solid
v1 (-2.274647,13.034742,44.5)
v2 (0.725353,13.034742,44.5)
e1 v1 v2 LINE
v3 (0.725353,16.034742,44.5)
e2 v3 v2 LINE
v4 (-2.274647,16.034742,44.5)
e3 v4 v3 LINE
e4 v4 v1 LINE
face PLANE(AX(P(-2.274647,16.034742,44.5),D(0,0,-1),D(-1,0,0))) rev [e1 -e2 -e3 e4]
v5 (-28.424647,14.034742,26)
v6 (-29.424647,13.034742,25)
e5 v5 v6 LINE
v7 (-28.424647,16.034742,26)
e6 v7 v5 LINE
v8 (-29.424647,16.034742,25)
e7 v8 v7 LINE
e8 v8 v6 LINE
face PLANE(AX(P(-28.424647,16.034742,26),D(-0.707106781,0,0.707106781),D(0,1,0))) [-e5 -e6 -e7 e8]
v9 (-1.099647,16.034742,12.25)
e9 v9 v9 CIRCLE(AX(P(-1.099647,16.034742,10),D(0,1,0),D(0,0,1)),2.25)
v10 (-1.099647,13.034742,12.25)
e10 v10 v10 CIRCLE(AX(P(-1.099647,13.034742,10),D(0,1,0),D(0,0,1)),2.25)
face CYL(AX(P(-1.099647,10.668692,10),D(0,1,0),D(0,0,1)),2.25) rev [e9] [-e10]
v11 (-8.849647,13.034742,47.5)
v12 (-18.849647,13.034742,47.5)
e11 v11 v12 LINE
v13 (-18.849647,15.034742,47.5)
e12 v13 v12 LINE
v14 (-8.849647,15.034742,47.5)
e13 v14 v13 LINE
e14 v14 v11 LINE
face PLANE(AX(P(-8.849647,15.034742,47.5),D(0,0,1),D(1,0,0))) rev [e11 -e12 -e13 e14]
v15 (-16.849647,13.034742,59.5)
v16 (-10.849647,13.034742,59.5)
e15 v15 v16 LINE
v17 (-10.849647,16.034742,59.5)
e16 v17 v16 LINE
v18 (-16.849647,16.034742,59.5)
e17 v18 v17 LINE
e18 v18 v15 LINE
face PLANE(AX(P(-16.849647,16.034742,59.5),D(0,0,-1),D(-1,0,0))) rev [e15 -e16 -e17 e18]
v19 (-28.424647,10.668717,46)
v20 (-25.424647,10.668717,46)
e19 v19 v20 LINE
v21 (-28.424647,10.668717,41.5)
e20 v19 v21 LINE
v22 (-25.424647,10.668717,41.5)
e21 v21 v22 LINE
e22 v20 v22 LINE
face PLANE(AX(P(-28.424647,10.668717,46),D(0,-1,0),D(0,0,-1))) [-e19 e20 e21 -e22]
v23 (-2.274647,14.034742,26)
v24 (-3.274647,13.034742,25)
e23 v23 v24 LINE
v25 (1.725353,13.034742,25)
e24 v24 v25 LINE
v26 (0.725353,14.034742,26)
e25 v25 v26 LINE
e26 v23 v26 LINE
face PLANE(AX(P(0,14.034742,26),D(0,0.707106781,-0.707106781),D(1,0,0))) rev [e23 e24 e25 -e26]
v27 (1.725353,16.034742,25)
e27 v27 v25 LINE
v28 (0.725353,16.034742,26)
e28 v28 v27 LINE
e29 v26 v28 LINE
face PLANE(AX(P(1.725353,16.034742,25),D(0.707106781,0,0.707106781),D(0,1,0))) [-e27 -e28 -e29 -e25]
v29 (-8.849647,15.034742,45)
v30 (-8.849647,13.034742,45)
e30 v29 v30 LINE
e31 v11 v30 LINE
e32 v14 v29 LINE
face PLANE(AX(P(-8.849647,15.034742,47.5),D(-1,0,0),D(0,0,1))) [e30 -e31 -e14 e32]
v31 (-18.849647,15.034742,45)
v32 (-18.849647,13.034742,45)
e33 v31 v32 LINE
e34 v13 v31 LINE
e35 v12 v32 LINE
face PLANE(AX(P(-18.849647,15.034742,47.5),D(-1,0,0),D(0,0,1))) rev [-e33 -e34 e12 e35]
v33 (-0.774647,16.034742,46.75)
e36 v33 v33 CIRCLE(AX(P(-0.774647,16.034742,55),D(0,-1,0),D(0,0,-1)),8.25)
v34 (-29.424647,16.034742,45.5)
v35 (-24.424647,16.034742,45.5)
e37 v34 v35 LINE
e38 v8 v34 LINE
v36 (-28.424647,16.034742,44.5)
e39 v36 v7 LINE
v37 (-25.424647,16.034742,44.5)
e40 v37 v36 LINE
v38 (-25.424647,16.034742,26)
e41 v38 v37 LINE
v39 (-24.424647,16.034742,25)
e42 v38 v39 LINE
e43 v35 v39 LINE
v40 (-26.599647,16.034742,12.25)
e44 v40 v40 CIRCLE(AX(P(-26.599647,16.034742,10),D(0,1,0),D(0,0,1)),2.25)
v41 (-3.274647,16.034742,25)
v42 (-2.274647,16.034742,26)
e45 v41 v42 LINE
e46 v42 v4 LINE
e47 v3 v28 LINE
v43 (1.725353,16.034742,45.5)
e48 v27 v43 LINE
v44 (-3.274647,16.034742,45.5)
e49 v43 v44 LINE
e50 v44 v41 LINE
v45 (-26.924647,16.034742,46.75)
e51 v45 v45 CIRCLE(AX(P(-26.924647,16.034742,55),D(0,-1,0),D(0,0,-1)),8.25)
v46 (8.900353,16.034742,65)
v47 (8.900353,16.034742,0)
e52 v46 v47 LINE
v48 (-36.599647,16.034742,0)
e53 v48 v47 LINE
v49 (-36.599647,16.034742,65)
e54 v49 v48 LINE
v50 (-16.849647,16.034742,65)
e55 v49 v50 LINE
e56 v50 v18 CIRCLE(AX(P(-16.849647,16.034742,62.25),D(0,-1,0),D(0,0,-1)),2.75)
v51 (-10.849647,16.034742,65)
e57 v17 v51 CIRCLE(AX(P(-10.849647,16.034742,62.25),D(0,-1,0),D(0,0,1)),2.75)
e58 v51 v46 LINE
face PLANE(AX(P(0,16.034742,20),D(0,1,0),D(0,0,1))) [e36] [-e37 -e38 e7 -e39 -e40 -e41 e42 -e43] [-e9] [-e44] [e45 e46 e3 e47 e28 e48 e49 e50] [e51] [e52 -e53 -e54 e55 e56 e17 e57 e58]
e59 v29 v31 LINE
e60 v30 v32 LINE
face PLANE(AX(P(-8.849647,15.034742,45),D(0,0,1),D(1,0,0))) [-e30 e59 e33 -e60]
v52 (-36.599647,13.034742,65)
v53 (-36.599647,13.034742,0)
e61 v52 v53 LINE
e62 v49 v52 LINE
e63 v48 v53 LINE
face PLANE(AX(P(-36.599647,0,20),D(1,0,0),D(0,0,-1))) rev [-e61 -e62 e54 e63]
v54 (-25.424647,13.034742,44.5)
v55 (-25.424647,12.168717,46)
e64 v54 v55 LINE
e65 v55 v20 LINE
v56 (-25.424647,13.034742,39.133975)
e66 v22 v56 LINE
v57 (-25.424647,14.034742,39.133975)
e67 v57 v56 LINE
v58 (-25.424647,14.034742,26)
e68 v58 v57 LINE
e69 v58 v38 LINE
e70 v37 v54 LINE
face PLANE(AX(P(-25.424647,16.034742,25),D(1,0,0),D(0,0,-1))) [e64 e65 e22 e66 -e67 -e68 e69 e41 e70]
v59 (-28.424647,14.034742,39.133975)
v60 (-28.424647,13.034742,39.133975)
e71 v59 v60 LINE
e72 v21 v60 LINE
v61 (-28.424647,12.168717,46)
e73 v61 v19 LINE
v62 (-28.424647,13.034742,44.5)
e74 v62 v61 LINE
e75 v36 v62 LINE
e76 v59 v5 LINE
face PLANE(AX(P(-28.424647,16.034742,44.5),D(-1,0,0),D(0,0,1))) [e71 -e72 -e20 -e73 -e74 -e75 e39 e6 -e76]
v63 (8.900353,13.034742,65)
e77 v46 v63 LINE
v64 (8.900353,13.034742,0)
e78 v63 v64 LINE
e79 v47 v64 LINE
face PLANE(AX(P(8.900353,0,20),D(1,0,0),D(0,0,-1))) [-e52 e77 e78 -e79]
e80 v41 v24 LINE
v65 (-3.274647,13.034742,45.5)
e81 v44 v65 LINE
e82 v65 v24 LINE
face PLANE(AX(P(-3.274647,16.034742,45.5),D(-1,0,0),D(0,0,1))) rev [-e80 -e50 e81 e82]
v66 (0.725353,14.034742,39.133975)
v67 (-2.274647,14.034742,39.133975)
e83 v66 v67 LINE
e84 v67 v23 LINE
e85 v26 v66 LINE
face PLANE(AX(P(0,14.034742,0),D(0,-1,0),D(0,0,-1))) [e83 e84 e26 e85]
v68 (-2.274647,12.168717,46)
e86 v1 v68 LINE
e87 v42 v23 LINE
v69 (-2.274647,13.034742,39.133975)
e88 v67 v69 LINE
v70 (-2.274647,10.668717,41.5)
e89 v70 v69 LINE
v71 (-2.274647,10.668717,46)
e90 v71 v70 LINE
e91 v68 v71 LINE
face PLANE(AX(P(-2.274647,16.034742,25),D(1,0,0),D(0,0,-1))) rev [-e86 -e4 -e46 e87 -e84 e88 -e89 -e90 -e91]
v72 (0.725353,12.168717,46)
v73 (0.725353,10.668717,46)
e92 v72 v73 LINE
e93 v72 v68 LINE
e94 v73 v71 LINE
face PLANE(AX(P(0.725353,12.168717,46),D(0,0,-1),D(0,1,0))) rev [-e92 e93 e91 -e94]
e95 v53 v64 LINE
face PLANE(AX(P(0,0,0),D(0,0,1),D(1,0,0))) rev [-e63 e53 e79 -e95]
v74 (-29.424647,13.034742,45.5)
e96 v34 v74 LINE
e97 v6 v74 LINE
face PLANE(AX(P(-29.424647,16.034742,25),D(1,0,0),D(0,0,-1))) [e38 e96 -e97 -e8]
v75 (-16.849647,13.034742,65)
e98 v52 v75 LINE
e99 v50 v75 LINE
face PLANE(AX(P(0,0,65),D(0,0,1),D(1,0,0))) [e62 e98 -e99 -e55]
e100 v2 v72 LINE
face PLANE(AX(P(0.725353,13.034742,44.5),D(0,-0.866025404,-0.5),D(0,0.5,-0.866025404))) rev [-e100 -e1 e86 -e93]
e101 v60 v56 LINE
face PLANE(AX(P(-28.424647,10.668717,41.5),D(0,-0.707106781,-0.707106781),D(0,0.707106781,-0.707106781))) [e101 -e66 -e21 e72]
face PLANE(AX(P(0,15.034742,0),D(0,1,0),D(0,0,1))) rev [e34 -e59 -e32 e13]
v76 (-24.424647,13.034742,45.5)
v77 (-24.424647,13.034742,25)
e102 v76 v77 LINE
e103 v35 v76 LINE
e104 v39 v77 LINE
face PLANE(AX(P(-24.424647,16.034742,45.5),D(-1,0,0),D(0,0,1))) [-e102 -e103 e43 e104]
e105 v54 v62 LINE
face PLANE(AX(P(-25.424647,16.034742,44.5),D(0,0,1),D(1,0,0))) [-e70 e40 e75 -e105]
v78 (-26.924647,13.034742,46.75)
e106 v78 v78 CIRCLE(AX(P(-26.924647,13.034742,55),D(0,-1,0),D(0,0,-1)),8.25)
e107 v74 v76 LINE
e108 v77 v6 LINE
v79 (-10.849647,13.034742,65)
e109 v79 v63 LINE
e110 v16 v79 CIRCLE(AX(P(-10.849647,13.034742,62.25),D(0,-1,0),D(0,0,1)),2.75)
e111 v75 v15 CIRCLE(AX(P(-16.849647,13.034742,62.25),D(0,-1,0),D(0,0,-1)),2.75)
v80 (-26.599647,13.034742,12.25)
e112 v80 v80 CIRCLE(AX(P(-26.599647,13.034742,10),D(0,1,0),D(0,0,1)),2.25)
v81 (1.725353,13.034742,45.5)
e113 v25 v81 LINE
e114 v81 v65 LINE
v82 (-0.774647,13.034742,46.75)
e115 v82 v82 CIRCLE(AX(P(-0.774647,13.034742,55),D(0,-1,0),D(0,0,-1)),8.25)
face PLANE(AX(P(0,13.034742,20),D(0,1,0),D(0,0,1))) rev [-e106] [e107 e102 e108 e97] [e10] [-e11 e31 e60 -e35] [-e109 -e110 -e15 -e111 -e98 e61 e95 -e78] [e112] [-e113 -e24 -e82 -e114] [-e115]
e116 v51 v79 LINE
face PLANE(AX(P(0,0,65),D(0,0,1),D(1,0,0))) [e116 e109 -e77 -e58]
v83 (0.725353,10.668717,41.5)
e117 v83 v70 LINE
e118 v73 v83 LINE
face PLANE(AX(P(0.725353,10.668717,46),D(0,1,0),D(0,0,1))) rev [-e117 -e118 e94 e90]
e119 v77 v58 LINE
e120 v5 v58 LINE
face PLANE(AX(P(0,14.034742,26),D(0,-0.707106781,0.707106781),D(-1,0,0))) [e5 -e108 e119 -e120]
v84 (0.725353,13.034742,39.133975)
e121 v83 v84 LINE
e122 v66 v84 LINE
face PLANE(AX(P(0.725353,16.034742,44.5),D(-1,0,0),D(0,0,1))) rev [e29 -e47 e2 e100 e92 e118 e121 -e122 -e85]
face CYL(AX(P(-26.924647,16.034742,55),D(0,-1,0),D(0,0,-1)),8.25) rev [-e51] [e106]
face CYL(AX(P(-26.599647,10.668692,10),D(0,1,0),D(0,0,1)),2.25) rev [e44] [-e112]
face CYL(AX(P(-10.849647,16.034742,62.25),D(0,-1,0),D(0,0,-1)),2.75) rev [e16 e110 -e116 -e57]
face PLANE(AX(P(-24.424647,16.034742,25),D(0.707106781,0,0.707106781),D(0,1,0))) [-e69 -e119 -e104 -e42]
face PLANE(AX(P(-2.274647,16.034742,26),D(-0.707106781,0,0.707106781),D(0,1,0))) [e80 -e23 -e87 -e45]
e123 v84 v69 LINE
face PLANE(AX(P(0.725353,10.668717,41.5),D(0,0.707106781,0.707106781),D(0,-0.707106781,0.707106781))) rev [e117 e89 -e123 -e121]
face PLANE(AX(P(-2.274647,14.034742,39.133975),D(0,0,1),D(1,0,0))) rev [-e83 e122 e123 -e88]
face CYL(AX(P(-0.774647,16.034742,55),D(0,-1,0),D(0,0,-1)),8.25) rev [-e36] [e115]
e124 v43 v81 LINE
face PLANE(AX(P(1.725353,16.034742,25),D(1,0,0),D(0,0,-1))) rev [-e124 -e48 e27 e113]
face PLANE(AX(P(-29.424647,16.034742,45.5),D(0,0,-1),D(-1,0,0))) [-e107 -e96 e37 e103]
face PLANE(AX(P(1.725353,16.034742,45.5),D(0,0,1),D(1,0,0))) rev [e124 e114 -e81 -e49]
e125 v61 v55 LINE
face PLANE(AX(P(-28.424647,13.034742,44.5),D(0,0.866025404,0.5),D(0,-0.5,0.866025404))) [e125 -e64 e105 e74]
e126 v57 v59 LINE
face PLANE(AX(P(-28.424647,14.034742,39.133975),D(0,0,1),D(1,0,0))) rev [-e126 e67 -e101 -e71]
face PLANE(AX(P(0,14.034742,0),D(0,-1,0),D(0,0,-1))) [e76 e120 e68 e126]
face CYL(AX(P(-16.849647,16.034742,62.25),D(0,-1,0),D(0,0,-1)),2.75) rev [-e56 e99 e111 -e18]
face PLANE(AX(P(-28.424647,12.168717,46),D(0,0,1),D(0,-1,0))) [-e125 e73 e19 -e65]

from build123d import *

# Parameters (mm, degrees)
SKETCH1_W           = 45.5
SKETCH1_H           = 3
BOSS_EXTRUDE1_DEPTH = 20
SKETCH2_W           = 45.5
SKETCH2_H           = 3
BOSS_EXTRUDE2_DEPTH = 45
SKETCH3_R           = 8.25
CUT_EXTRUDE1_DEPTH  = 75.656105932
CUT_EXTRUDE2_DEPTH  = 75.656105932
BOSS_EXTRUDE4_DEPTH = 3
CUT_EXTRUDE3_DEPTH  = 75.656105932
SKETCH10_W          = 10
SKETCH10_H          = 2.5
CUT_EXTRUDE4_DEPTH  = 2
SKETCH13_W          = 3
SKETCH13_H          = 14.133974596
CUT_EXTRUDE6_DEPTH  = 1
CHAMFER1_SIZE       = 1
SKETCH15_R          = 2.25
CUT_EXTRUDE7_DEPTH  = 75.788557826
CHAMFER2_SIZE       = 1


with BuildPart() as part:
    # Sketch1 → Boss-Extrude1 (new body)
    with BuildSketch(Plane.XY):
        with Locations((-13.849646897, 14.534741944)):
            Rectangle(SKETCH1_W, SKETCH1_H)
    extrude(amount=BOSS_EXTRUDE1_DEPTH)

    # Sketch2 → Boss-Extrude2 (add)
    with BuildSketch(Plane.XY.offset(20)):
        with Locations((-13.849646897, 14.534741944)):
            Rectangle(SKETCH2_W, SKETCH2_H)
    extrude(amount=BOSS_EXTRUDE2_DEPTH)

    # Sketch3 → Cut-Extrude1 (cut, through all)
    with BuildSketch(Plane(origin=(0, 13.034741944, 0), x_dir=(-1, 0, 0), z_dir=(0, -1, 0))):
        with Locations(Location((26.924646897, -55, 0), (0, 0, 90))):
            Circle(SKETCH3_R)
        with Locations(Location((0.774646897, -55, 0), (0, 0, 90))):
            Circle(SKETCH3_R)
    extrude(amount=-CUT_EXTRUDE1_DEPTH, mode=Mode.SUBTRACT)

    # Sketch5 → Cut-Extrude2 (cut, through all)
    with BuildSketch(Plane(origin=(0, 13.034741944, 0), x_dir=(-1, 0, 0), z_dir=(0, -1, 0))):
        Polygon((29.424646897, -25), (29.424646897, -45.5), (24.424646897, -45.5), (24.424646897, -25), (25.424646897, -25), (25.424646897, -44.5), (28.424646897, -44.5), (28.424646897, -25), align=None)
        Polygon((-0.725353103, -25), (-1.725353103, -25), (-1.725353103, -45.5), (3.274646897, -45.5), (3.274646897, -25), (2.274646897, -25), (2.274646897, -44.5), (-0.725353103, -44.5), align=None)
    extrude(amount=-CUT_EXTRUDE2_DEPTH, mode=Mode.SUBTRACT)

    # Sketch6 → Boss-Extrude4 (add)
    with BuildSketch(Plane(origin=(-25.424646897, 0, 0), x_dir=(0, 0, -1), z_dir=(1, 0, 0))):
        Polygon((-44.5, 13.034741944), (-46, 12.16871654), (-46, 10.66871654), (-41.5, 10.66871654), (-39.133974596, 13.034741944), align=None)
    boss_extrude4 = extrude(amount=-BOSS_EXTRUDE4_DEPTH)

    # Mirror7: Boss-Extrude4 across plane
    add(boss_extrude4.mirror(Plane(origin=(-13.849646897, 13.034741944, 25), x_dir=(0, 0, 1), z_dir=(1, 0, 0))))

    # Sketch9 → Cut-Extrude3 (cut, through all)
    with BuildSketch(Plane(origin=(0, 13.034741944, 0), x_dir=(-1, 0, 0), z_dir=(0, -1, 0))):
        with BuildLine():
            Line((16.849646897, -65), (10.849646897, -65))
            ThreePointArc((10.849646897, -65), (8.099646897, -62.25), (10.849646897, -59.5))
            Line((10.849646897, -59.5), (16.849646897, -59.5))
            ThreePointArc((16.849646897, -59.5), (19.599646897, -62.25), (16.849646897, -65))
        make_face()
    extrude(amount=-CUT_EXTRUDE3_DEPTH, mode=Mode.SUBTRACT)

    # Sketch10 → Cut-Extrude4 (cut)
    with BuildSketch(Plane(origin=(0, 13.034741944, 0), x_dir=(-1, 0, 0), z_dir=(0, -1, 0))):
        with Locations((13.849646897, -46.25)):
            Rectangle(SKETCH10_W, SKETCH10_H)
    extrude(amount=-CUT_EXTRUDE4_DEPTH, mode=Mode.SUBTRACT)

    # Sketch13 → Cut-Extrude6 (cut)
    with BuildSketch(Plane(origin=(0, 13.034741944, 0), x_dir=(-1, 0, 0), z_dir=(0, -1, 0))):
        with Locations((26.924646897, -32.066987298)):
            Rectangle(SKETCH13_W, SKETCH13_H)
        with Locations((0.774646897, -32.066987298)):
            Rectangle(SKETCH13_W, SKETCH13_H)
    extrude(amount=-CUT_EXTRUDE6_DEPTH, mode=Mode.SUBTRACT)

    # Chamfer1
    chamfer1_edges = [part.edges().sort_by_distance(p)[0] for p in [
        (-26.924646897, 14.034741944, 25),
        (-0.774646897, 14.034741944, 25),
    ]]
    chamfer(chamfer1_edges, length=CHAMFER1_SIZE - 0.0001)  # a hair under: the kernel refuses the full size

    # Sketch15 → Cut-Extrude7 (cut, through all)
    with BuildSketch(Plane(origin=(0, 16.034741944, 0), x_dir=(1, 0, 0), z_dir=(0, 1, 0))):
        with Locations(Location((-26.599646897, -10, 0), (0, 0, 270))):
            Circle(SKETCH15_R)
        with Locations(Location((-1.099646897, -10, 0), (0, 0, 270))):
            Circle(SKETCH15_R)
    extrude(amount=-CUT_EXTRUDE7_DEPTH, mode=Mode.SUBTRACT)

    # Chamfer2
    chamfer2_edges = [part.edges().sort_by_distance(p)[0] for p in [
        (-28.424646897, 14.534791944, 25),
        (-25.424646897, 14.534791944, 25),
        (0.725353103, 14.534791944, 25),
        (-2.274646897, 14.534791944, 25),
    ]]
    chamfer(chamfer2_edges, length=CHAMFER2_SIZE - 0.0001)  # a hair under: the kernel refuses the full size


solid = part.part
